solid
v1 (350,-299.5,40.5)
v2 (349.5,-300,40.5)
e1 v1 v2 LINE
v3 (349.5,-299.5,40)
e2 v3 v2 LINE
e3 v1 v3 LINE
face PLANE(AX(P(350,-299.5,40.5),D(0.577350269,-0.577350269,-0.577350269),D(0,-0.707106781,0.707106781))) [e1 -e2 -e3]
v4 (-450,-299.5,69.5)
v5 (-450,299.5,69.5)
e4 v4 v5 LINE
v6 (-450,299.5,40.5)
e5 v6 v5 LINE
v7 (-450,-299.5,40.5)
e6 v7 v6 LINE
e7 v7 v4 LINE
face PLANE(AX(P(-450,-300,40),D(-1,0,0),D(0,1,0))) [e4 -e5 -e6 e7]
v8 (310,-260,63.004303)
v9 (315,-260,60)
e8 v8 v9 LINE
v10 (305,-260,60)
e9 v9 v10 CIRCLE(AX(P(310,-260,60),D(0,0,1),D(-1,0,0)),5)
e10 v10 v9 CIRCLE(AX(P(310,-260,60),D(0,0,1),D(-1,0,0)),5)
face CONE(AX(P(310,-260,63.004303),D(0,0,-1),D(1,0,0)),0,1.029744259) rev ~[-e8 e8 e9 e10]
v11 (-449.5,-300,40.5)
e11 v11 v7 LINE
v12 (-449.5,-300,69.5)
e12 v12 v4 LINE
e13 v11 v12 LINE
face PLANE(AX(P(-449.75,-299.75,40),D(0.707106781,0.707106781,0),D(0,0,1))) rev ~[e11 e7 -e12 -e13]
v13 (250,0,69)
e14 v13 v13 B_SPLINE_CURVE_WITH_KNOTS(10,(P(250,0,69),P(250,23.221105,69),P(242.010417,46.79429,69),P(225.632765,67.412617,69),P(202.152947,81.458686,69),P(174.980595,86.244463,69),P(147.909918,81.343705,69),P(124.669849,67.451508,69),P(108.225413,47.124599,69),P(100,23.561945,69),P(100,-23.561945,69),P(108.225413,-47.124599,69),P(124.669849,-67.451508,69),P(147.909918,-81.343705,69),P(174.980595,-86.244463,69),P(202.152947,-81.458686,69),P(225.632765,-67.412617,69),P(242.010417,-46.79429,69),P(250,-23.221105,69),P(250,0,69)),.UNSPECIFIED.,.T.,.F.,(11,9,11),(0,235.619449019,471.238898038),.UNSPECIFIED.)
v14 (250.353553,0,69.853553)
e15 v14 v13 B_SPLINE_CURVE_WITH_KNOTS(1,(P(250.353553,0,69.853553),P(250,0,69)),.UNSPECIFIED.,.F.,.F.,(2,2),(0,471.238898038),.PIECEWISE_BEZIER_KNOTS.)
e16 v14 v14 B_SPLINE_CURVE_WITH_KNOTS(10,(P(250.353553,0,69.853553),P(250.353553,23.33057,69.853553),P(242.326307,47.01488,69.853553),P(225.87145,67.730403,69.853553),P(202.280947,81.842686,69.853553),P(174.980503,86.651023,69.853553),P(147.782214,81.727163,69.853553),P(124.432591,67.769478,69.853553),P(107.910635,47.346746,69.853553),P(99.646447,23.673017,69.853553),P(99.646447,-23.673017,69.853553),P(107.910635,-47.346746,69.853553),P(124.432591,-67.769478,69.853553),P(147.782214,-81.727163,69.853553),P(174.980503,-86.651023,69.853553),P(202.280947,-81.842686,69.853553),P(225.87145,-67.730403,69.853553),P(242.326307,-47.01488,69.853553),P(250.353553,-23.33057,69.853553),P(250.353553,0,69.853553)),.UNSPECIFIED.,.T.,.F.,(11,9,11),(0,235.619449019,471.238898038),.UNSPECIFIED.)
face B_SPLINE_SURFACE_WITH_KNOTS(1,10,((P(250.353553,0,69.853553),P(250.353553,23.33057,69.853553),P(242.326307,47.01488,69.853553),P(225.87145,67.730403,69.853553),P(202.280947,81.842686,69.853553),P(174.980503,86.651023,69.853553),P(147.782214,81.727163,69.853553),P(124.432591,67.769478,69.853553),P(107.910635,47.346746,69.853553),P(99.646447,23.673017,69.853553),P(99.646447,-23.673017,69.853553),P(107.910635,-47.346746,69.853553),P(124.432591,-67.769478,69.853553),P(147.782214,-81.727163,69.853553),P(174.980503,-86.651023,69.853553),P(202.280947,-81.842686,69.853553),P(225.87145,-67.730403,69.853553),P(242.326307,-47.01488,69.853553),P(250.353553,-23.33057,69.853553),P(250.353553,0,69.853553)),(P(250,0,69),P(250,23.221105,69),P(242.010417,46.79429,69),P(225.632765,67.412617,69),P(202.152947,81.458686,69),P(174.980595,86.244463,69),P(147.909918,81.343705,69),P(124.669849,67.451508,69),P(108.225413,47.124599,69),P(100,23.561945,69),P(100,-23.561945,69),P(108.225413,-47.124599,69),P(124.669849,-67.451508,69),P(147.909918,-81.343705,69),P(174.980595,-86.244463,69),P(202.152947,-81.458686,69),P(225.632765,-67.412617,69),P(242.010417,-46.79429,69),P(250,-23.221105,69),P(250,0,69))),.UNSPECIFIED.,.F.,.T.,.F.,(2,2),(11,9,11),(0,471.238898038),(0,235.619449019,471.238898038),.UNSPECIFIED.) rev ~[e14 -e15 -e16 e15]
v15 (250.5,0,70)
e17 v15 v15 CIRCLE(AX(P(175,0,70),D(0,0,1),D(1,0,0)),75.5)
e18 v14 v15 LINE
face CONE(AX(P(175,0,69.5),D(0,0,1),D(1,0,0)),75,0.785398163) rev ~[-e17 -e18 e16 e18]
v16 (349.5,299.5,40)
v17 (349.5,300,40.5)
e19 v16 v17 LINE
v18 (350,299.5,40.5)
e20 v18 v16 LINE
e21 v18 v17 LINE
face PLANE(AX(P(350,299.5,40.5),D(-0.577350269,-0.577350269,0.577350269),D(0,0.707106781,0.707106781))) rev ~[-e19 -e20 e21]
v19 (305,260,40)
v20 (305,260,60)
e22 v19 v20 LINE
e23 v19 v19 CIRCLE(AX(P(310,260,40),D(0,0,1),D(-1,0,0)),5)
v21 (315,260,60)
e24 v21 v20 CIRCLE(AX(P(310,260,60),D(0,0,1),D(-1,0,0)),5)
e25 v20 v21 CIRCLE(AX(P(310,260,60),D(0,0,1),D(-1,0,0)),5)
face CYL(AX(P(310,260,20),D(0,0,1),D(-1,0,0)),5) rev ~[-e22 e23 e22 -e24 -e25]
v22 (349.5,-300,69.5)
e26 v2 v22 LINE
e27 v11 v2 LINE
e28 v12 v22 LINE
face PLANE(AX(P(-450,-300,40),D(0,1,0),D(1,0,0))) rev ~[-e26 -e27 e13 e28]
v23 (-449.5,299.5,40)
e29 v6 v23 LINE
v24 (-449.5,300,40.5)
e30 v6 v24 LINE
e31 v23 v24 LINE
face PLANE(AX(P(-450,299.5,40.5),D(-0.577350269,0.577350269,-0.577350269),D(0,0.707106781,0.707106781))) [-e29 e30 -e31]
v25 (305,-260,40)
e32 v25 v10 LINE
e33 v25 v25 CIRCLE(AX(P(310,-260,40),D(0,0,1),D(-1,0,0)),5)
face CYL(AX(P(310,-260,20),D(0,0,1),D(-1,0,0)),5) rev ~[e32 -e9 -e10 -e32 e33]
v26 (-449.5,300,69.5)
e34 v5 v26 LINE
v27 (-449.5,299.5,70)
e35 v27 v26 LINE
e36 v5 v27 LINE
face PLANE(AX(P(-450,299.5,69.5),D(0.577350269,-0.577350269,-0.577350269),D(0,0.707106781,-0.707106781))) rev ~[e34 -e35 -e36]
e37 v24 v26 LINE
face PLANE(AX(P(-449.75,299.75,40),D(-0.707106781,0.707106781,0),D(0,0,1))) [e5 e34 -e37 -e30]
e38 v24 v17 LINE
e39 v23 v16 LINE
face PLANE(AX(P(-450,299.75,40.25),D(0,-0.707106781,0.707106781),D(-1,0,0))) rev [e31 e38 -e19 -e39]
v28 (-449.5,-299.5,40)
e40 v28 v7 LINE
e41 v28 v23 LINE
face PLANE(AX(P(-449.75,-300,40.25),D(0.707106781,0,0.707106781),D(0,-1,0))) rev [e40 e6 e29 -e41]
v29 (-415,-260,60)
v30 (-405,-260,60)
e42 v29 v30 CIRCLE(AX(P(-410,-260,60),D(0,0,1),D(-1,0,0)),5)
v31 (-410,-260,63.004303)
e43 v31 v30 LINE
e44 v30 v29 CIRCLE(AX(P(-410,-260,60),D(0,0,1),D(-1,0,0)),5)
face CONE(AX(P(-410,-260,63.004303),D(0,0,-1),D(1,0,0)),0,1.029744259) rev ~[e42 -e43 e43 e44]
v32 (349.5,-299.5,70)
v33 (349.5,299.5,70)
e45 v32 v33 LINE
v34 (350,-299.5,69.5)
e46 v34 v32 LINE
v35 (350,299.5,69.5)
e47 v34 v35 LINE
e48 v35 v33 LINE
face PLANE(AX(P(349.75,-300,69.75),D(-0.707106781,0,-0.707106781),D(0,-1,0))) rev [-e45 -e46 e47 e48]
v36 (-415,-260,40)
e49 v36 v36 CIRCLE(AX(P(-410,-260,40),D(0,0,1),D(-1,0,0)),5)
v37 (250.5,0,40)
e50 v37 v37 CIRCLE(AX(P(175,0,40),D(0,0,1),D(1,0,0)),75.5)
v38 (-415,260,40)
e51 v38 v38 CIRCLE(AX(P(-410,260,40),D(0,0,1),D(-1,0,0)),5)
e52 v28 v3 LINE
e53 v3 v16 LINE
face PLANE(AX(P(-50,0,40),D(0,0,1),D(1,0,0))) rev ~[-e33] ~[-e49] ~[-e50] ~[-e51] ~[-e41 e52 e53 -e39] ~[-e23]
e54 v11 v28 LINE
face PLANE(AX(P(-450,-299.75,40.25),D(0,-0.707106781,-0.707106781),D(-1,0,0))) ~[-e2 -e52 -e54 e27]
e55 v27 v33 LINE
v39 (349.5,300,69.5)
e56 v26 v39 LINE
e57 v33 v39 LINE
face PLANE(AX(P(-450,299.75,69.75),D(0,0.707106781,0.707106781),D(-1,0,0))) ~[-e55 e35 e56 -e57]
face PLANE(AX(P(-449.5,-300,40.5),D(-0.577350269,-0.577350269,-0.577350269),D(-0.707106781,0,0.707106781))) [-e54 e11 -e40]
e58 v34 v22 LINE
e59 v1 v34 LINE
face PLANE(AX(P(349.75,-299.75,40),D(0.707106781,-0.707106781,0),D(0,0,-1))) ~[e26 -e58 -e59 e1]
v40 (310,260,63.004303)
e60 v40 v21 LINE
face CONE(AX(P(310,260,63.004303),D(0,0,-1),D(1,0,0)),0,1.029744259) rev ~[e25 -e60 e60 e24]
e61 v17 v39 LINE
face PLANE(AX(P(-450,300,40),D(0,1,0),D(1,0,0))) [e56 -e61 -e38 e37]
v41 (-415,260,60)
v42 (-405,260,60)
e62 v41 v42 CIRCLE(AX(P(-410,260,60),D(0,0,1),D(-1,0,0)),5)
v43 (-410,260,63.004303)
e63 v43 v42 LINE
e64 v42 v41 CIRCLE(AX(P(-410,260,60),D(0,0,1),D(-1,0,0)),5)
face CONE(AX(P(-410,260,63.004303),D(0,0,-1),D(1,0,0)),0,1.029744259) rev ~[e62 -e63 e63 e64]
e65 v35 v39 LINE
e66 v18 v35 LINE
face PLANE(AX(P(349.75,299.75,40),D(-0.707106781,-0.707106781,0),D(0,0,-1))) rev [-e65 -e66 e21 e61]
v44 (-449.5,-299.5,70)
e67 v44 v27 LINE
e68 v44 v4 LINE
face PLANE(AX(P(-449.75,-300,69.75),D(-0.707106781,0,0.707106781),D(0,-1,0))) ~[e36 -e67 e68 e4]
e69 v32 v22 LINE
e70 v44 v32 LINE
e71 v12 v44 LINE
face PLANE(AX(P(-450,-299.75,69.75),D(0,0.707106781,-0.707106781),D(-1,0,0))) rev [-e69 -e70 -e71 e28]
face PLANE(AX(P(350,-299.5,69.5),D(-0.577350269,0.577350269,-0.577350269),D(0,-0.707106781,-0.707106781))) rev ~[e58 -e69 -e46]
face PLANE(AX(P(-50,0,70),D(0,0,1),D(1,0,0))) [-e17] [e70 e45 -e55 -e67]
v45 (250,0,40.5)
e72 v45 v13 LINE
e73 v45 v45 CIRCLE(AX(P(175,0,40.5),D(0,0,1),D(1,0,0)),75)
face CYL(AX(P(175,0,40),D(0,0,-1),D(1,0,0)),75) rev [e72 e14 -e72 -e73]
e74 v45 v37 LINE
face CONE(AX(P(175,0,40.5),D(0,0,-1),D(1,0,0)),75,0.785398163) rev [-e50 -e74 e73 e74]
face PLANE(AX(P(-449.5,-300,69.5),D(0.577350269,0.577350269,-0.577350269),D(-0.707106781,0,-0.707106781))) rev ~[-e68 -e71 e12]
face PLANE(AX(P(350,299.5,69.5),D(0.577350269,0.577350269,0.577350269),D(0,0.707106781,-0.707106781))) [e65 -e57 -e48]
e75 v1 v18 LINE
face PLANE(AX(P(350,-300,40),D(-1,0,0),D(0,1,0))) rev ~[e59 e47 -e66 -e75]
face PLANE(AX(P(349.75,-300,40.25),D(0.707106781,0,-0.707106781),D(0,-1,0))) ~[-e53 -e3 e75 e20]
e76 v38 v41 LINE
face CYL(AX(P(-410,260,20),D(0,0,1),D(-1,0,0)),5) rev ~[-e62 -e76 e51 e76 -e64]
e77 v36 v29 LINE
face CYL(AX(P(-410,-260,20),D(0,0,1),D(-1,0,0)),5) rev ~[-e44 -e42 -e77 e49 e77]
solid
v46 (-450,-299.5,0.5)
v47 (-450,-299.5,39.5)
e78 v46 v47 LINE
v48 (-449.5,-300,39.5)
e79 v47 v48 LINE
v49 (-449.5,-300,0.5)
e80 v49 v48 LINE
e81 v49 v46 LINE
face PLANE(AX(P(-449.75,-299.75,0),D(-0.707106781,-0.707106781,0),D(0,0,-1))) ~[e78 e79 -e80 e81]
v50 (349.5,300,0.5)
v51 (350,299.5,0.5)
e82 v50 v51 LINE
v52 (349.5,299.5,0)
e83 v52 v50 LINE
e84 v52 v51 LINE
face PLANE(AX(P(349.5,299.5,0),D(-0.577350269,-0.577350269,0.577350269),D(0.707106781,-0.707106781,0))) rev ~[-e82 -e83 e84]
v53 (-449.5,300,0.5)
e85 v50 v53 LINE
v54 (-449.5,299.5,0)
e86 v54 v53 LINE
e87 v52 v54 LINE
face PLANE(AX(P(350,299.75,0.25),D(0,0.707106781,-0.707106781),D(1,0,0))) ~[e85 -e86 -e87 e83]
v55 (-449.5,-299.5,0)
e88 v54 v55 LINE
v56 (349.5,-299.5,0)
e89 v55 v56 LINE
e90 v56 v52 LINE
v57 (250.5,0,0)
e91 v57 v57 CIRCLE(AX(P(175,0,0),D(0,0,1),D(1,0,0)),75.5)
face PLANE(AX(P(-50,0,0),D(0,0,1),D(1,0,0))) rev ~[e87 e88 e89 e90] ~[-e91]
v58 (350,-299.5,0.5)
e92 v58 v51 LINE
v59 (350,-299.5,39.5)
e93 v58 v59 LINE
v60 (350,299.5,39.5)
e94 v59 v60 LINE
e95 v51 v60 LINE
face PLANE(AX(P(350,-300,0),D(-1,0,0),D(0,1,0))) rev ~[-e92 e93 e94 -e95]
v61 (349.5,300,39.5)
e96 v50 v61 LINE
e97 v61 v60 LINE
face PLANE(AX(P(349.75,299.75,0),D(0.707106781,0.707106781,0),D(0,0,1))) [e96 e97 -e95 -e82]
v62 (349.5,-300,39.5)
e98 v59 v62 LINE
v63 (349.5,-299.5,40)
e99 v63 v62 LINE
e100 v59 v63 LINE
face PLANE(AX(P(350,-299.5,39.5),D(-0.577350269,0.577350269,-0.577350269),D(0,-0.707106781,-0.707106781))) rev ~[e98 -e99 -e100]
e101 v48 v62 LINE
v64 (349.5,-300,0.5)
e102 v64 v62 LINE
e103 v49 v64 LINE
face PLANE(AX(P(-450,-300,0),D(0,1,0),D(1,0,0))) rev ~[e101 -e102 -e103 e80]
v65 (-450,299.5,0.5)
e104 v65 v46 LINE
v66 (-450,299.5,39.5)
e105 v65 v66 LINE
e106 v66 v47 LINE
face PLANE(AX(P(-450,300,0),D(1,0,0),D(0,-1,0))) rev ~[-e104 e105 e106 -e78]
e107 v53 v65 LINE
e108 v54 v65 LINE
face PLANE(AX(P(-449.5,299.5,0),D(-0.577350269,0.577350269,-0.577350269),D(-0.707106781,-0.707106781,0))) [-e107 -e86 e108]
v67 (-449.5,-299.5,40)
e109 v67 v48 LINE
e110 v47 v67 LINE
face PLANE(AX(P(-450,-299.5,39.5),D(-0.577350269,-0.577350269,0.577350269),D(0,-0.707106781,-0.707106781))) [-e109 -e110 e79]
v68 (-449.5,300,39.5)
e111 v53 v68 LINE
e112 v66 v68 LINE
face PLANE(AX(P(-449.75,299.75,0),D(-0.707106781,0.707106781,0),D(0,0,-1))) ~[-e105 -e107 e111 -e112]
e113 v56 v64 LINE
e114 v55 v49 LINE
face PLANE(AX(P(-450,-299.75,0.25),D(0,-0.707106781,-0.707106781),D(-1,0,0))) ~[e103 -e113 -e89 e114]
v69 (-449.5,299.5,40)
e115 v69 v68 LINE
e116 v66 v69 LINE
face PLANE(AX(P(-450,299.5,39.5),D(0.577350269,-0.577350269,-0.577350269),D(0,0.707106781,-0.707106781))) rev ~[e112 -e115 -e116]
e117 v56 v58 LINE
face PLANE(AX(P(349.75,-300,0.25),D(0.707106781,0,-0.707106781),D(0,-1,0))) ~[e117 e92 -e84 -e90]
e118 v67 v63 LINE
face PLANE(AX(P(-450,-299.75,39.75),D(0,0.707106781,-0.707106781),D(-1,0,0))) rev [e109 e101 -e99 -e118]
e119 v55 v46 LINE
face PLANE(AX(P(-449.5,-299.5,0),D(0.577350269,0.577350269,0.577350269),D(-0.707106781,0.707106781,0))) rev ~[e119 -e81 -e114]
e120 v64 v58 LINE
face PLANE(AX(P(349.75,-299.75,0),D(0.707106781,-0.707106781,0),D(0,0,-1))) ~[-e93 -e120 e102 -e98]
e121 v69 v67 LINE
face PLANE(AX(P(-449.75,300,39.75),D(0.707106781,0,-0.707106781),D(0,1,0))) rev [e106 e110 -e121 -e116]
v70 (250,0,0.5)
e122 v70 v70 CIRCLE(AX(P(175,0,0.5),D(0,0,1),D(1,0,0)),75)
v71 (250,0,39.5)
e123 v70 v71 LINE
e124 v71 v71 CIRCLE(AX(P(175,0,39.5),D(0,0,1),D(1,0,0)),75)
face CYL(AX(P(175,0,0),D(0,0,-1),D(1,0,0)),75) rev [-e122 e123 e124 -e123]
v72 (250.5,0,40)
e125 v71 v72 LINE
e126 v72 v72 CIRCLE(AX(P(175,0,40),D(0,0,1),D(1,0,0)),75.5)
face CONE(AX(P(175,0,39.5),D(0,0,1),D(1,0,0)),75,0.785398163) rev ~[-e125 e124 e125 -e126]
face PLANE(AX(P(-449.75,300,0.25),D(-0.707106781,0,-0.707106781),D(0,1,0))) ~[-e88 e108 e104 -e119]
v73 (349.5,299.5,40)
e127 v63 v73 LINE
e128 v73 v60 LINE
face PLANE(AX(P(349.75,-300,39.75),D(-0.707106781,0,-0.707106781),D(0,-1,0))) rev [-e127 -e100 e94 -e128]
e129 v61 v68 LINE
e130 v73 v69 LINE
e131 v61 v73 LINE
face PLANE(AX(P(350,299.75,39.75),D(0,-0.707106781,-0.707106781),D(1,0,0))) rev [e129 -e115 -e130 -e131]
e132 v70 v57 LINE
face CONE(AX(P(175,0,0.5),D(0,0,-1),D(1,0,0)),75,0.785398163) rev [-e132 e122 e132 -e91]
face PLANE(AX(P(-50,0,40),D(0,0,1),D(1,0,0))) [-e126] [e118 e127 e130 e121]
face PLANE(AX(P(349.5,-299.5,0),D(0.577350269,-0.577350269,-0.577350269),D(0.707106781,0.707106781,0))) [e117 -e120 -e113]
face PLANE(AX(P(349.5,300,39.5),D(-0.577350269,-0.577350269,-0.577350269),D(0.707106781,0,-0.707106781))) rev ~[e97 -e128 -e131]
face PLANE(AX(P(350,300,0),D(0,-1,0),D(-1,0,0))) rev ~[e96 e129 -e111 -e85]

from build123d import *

# Parameters (mm, degrees)
F0_R      = 75
F1_DEPTH  = 40
F3_W      = 800
F3_H      = 600
F3_W_2    = 720
F3_H_2    = 520
F3_R      = 75
F4_DEPTH  = 30
F5_SIZE   = 0.5
F6_D      = 10
F6_DEPTH  = 20
F6_TIP    = 3.0043030951
F7_SIZE   = 0.5
F7_2_SIZE = 0.5


# Not quite as in the source:
# - a feature names something its author has since deleted; it is built from what else it names


with BuildPart() as f1:
    # F0 (on Top) → F1 (new body)
    with BuildSketch(Plane.XY):
        with BuildLine():
            Line((330, 75), (350, 75))
            Line((350, 75), (350, 300))
            Line((350, 300), (-450, 300))
            Line((-450, 300), (-450, 75))
            Line((-450, 75), (-430, 75))
            ThreePointArc((-430, 75), (-422.9289321881, 72.0710678119), (-420, 65))
            Line((-420, 65), (-420, 0))
            Line((-420, 0), (-420, -65))
            ThreePointArc((-420, -65), (-422.9289321881, -72.0710678119), (-430, -75))
            Line((-430, -75), (-450, -75))
            Line((-450, -75), (-450, -300))
            Line((-450, -300), (350, -300))
            Line((350, -300), (350, -75))
            Line((350, -75), (330, -75))
            ThreePointArc((330, -75), (322.9289321881, -72.0710678119), (320, -65))
            Line((320, -65), (320, 65))
            ThreePointArc((320, 65), (322.9289321881, 72.0710678119), (330, 75))
        make_face()
        with Locations((175, 0)):
            Circle(F0_R, mode=Mode.SUBTRACT)
        with BuildLine():
            Line((350, -75), (350, 75))
            Line((350, 75), (330, 75))
            ThreePointArc((330, 75), (322.9289321881, 72.0710678119), (320, 65))
            Line((320, 65), (320, -65))
            ThreePointArc((320, -65), (322.9289321881, -72.0710678119), (330, -75))
            Line((330, -75), (350, -75))
        make_face()
        with BuildLine():
            Line((-450, 0), (-450, -75))
            Line((-450, -75), (-430, -75))
            ThreePointArc((-430, -75), (-422.9289321881, -72.0710678119), (-420, -65))
            Line((-420, -65), (-420, 0))
            Line((-420, 0), (-450, 0))
        make_face()
        with BuildLine():
            Line((-430, 75), (-450, 75))
            Line((-450, 75), (-450, 0))
            Line((-450, 0), (-420, 0))
            Line((-420, 0), (-420, 65))
            ThreePointArc((-420, 65), (-422.9289321881, 72.0710678119), (-430, 75))
        make_face()
    extrude(amount=F1_DEPTH)

    # F7
    f7_edges = [f1.edges().sort_by_distance(p)[0] for p in [
        (-50, -300, 40),
        (350, 0, 40),
        (-50, 300, 40),
        (-450, 0, 40),
        (100, 0, 40),
        (-450, -300, 20),
        (350, -300, 20),
        (-50, -300, 0),
        (350, 300, 20),
        (-450, 300, 20),
        (-50, 300, 0),
        (350, 0, 0),
        (-450, 0, 0),
        (100, 0, 0),
    ]]
    chamfer(f7_edges, length=F7_SIZE)


with BuildPart() as f4:
    # F3 (on face) → F4 (new body)
    with BuildSketch(Plane.XY.offset(40)):
        with Locations((-50, 0)):
            Rectangle(F3_W, F3_H)
        with Locations((-50, 0)):
            Rectangle(F3_W_2, F3_H_2, mode=Mode.SUBTRACT)
        with Locations((-50, 0)):
            Rectangle(F3_W_2, F3_H_2)
        with Locations((175, 0)):
            Circle(F3_R, mode=Mode.SUBTRACT)
    extrude(amount=F4_DEPTH)

    # F5
    f5_edges = [f4.edges().sort_by_distance(p)[0] for p in [
        (-50, 300, 70),
        (-450, 0, 70),
        (-50, -300, 70),
        (350, 0, 70),
        (100, 0, 70),
        (-50, 300, 40),
        (-450, 0, 40),
        (-50, -300, 40),
        (350, 0, 40),
        (100, 0, 40),
        (350, 300, 55),
        (-450, 300, 55),
        (-450, -300, 55),
        (350, -300, 55),
    ]]
    chamfer(f5_edges, length=F5_SIZE)

    # F6
    with Locations(Plane(origin=(0, 0, 40), x_dir=(1, 0, 0), z_dir=(0, 0, -1))):
        with Locations((-410, -260), (310, -260), (310, 260), (-410, 260)):
            Hole(F6_D / 2, depth=F6_DEPTH)
            with Locations((0, 0, -(F6_DEPTH + F6_TIP / 2))):  # 118° drill point
                Cone(0, F6_D / 2, F6_TIP, mode=Mode.SUBTRACT)

    # F7#2
    f7_2_edges = [f4.edges().sort_by_distance(p)[0] for p in [
        (100, 0, 69.5),
    ]]
    chamfer(f7_2_edges, length=F7_2_SIZE)


solid = Compound([f1.part, f4.part])
